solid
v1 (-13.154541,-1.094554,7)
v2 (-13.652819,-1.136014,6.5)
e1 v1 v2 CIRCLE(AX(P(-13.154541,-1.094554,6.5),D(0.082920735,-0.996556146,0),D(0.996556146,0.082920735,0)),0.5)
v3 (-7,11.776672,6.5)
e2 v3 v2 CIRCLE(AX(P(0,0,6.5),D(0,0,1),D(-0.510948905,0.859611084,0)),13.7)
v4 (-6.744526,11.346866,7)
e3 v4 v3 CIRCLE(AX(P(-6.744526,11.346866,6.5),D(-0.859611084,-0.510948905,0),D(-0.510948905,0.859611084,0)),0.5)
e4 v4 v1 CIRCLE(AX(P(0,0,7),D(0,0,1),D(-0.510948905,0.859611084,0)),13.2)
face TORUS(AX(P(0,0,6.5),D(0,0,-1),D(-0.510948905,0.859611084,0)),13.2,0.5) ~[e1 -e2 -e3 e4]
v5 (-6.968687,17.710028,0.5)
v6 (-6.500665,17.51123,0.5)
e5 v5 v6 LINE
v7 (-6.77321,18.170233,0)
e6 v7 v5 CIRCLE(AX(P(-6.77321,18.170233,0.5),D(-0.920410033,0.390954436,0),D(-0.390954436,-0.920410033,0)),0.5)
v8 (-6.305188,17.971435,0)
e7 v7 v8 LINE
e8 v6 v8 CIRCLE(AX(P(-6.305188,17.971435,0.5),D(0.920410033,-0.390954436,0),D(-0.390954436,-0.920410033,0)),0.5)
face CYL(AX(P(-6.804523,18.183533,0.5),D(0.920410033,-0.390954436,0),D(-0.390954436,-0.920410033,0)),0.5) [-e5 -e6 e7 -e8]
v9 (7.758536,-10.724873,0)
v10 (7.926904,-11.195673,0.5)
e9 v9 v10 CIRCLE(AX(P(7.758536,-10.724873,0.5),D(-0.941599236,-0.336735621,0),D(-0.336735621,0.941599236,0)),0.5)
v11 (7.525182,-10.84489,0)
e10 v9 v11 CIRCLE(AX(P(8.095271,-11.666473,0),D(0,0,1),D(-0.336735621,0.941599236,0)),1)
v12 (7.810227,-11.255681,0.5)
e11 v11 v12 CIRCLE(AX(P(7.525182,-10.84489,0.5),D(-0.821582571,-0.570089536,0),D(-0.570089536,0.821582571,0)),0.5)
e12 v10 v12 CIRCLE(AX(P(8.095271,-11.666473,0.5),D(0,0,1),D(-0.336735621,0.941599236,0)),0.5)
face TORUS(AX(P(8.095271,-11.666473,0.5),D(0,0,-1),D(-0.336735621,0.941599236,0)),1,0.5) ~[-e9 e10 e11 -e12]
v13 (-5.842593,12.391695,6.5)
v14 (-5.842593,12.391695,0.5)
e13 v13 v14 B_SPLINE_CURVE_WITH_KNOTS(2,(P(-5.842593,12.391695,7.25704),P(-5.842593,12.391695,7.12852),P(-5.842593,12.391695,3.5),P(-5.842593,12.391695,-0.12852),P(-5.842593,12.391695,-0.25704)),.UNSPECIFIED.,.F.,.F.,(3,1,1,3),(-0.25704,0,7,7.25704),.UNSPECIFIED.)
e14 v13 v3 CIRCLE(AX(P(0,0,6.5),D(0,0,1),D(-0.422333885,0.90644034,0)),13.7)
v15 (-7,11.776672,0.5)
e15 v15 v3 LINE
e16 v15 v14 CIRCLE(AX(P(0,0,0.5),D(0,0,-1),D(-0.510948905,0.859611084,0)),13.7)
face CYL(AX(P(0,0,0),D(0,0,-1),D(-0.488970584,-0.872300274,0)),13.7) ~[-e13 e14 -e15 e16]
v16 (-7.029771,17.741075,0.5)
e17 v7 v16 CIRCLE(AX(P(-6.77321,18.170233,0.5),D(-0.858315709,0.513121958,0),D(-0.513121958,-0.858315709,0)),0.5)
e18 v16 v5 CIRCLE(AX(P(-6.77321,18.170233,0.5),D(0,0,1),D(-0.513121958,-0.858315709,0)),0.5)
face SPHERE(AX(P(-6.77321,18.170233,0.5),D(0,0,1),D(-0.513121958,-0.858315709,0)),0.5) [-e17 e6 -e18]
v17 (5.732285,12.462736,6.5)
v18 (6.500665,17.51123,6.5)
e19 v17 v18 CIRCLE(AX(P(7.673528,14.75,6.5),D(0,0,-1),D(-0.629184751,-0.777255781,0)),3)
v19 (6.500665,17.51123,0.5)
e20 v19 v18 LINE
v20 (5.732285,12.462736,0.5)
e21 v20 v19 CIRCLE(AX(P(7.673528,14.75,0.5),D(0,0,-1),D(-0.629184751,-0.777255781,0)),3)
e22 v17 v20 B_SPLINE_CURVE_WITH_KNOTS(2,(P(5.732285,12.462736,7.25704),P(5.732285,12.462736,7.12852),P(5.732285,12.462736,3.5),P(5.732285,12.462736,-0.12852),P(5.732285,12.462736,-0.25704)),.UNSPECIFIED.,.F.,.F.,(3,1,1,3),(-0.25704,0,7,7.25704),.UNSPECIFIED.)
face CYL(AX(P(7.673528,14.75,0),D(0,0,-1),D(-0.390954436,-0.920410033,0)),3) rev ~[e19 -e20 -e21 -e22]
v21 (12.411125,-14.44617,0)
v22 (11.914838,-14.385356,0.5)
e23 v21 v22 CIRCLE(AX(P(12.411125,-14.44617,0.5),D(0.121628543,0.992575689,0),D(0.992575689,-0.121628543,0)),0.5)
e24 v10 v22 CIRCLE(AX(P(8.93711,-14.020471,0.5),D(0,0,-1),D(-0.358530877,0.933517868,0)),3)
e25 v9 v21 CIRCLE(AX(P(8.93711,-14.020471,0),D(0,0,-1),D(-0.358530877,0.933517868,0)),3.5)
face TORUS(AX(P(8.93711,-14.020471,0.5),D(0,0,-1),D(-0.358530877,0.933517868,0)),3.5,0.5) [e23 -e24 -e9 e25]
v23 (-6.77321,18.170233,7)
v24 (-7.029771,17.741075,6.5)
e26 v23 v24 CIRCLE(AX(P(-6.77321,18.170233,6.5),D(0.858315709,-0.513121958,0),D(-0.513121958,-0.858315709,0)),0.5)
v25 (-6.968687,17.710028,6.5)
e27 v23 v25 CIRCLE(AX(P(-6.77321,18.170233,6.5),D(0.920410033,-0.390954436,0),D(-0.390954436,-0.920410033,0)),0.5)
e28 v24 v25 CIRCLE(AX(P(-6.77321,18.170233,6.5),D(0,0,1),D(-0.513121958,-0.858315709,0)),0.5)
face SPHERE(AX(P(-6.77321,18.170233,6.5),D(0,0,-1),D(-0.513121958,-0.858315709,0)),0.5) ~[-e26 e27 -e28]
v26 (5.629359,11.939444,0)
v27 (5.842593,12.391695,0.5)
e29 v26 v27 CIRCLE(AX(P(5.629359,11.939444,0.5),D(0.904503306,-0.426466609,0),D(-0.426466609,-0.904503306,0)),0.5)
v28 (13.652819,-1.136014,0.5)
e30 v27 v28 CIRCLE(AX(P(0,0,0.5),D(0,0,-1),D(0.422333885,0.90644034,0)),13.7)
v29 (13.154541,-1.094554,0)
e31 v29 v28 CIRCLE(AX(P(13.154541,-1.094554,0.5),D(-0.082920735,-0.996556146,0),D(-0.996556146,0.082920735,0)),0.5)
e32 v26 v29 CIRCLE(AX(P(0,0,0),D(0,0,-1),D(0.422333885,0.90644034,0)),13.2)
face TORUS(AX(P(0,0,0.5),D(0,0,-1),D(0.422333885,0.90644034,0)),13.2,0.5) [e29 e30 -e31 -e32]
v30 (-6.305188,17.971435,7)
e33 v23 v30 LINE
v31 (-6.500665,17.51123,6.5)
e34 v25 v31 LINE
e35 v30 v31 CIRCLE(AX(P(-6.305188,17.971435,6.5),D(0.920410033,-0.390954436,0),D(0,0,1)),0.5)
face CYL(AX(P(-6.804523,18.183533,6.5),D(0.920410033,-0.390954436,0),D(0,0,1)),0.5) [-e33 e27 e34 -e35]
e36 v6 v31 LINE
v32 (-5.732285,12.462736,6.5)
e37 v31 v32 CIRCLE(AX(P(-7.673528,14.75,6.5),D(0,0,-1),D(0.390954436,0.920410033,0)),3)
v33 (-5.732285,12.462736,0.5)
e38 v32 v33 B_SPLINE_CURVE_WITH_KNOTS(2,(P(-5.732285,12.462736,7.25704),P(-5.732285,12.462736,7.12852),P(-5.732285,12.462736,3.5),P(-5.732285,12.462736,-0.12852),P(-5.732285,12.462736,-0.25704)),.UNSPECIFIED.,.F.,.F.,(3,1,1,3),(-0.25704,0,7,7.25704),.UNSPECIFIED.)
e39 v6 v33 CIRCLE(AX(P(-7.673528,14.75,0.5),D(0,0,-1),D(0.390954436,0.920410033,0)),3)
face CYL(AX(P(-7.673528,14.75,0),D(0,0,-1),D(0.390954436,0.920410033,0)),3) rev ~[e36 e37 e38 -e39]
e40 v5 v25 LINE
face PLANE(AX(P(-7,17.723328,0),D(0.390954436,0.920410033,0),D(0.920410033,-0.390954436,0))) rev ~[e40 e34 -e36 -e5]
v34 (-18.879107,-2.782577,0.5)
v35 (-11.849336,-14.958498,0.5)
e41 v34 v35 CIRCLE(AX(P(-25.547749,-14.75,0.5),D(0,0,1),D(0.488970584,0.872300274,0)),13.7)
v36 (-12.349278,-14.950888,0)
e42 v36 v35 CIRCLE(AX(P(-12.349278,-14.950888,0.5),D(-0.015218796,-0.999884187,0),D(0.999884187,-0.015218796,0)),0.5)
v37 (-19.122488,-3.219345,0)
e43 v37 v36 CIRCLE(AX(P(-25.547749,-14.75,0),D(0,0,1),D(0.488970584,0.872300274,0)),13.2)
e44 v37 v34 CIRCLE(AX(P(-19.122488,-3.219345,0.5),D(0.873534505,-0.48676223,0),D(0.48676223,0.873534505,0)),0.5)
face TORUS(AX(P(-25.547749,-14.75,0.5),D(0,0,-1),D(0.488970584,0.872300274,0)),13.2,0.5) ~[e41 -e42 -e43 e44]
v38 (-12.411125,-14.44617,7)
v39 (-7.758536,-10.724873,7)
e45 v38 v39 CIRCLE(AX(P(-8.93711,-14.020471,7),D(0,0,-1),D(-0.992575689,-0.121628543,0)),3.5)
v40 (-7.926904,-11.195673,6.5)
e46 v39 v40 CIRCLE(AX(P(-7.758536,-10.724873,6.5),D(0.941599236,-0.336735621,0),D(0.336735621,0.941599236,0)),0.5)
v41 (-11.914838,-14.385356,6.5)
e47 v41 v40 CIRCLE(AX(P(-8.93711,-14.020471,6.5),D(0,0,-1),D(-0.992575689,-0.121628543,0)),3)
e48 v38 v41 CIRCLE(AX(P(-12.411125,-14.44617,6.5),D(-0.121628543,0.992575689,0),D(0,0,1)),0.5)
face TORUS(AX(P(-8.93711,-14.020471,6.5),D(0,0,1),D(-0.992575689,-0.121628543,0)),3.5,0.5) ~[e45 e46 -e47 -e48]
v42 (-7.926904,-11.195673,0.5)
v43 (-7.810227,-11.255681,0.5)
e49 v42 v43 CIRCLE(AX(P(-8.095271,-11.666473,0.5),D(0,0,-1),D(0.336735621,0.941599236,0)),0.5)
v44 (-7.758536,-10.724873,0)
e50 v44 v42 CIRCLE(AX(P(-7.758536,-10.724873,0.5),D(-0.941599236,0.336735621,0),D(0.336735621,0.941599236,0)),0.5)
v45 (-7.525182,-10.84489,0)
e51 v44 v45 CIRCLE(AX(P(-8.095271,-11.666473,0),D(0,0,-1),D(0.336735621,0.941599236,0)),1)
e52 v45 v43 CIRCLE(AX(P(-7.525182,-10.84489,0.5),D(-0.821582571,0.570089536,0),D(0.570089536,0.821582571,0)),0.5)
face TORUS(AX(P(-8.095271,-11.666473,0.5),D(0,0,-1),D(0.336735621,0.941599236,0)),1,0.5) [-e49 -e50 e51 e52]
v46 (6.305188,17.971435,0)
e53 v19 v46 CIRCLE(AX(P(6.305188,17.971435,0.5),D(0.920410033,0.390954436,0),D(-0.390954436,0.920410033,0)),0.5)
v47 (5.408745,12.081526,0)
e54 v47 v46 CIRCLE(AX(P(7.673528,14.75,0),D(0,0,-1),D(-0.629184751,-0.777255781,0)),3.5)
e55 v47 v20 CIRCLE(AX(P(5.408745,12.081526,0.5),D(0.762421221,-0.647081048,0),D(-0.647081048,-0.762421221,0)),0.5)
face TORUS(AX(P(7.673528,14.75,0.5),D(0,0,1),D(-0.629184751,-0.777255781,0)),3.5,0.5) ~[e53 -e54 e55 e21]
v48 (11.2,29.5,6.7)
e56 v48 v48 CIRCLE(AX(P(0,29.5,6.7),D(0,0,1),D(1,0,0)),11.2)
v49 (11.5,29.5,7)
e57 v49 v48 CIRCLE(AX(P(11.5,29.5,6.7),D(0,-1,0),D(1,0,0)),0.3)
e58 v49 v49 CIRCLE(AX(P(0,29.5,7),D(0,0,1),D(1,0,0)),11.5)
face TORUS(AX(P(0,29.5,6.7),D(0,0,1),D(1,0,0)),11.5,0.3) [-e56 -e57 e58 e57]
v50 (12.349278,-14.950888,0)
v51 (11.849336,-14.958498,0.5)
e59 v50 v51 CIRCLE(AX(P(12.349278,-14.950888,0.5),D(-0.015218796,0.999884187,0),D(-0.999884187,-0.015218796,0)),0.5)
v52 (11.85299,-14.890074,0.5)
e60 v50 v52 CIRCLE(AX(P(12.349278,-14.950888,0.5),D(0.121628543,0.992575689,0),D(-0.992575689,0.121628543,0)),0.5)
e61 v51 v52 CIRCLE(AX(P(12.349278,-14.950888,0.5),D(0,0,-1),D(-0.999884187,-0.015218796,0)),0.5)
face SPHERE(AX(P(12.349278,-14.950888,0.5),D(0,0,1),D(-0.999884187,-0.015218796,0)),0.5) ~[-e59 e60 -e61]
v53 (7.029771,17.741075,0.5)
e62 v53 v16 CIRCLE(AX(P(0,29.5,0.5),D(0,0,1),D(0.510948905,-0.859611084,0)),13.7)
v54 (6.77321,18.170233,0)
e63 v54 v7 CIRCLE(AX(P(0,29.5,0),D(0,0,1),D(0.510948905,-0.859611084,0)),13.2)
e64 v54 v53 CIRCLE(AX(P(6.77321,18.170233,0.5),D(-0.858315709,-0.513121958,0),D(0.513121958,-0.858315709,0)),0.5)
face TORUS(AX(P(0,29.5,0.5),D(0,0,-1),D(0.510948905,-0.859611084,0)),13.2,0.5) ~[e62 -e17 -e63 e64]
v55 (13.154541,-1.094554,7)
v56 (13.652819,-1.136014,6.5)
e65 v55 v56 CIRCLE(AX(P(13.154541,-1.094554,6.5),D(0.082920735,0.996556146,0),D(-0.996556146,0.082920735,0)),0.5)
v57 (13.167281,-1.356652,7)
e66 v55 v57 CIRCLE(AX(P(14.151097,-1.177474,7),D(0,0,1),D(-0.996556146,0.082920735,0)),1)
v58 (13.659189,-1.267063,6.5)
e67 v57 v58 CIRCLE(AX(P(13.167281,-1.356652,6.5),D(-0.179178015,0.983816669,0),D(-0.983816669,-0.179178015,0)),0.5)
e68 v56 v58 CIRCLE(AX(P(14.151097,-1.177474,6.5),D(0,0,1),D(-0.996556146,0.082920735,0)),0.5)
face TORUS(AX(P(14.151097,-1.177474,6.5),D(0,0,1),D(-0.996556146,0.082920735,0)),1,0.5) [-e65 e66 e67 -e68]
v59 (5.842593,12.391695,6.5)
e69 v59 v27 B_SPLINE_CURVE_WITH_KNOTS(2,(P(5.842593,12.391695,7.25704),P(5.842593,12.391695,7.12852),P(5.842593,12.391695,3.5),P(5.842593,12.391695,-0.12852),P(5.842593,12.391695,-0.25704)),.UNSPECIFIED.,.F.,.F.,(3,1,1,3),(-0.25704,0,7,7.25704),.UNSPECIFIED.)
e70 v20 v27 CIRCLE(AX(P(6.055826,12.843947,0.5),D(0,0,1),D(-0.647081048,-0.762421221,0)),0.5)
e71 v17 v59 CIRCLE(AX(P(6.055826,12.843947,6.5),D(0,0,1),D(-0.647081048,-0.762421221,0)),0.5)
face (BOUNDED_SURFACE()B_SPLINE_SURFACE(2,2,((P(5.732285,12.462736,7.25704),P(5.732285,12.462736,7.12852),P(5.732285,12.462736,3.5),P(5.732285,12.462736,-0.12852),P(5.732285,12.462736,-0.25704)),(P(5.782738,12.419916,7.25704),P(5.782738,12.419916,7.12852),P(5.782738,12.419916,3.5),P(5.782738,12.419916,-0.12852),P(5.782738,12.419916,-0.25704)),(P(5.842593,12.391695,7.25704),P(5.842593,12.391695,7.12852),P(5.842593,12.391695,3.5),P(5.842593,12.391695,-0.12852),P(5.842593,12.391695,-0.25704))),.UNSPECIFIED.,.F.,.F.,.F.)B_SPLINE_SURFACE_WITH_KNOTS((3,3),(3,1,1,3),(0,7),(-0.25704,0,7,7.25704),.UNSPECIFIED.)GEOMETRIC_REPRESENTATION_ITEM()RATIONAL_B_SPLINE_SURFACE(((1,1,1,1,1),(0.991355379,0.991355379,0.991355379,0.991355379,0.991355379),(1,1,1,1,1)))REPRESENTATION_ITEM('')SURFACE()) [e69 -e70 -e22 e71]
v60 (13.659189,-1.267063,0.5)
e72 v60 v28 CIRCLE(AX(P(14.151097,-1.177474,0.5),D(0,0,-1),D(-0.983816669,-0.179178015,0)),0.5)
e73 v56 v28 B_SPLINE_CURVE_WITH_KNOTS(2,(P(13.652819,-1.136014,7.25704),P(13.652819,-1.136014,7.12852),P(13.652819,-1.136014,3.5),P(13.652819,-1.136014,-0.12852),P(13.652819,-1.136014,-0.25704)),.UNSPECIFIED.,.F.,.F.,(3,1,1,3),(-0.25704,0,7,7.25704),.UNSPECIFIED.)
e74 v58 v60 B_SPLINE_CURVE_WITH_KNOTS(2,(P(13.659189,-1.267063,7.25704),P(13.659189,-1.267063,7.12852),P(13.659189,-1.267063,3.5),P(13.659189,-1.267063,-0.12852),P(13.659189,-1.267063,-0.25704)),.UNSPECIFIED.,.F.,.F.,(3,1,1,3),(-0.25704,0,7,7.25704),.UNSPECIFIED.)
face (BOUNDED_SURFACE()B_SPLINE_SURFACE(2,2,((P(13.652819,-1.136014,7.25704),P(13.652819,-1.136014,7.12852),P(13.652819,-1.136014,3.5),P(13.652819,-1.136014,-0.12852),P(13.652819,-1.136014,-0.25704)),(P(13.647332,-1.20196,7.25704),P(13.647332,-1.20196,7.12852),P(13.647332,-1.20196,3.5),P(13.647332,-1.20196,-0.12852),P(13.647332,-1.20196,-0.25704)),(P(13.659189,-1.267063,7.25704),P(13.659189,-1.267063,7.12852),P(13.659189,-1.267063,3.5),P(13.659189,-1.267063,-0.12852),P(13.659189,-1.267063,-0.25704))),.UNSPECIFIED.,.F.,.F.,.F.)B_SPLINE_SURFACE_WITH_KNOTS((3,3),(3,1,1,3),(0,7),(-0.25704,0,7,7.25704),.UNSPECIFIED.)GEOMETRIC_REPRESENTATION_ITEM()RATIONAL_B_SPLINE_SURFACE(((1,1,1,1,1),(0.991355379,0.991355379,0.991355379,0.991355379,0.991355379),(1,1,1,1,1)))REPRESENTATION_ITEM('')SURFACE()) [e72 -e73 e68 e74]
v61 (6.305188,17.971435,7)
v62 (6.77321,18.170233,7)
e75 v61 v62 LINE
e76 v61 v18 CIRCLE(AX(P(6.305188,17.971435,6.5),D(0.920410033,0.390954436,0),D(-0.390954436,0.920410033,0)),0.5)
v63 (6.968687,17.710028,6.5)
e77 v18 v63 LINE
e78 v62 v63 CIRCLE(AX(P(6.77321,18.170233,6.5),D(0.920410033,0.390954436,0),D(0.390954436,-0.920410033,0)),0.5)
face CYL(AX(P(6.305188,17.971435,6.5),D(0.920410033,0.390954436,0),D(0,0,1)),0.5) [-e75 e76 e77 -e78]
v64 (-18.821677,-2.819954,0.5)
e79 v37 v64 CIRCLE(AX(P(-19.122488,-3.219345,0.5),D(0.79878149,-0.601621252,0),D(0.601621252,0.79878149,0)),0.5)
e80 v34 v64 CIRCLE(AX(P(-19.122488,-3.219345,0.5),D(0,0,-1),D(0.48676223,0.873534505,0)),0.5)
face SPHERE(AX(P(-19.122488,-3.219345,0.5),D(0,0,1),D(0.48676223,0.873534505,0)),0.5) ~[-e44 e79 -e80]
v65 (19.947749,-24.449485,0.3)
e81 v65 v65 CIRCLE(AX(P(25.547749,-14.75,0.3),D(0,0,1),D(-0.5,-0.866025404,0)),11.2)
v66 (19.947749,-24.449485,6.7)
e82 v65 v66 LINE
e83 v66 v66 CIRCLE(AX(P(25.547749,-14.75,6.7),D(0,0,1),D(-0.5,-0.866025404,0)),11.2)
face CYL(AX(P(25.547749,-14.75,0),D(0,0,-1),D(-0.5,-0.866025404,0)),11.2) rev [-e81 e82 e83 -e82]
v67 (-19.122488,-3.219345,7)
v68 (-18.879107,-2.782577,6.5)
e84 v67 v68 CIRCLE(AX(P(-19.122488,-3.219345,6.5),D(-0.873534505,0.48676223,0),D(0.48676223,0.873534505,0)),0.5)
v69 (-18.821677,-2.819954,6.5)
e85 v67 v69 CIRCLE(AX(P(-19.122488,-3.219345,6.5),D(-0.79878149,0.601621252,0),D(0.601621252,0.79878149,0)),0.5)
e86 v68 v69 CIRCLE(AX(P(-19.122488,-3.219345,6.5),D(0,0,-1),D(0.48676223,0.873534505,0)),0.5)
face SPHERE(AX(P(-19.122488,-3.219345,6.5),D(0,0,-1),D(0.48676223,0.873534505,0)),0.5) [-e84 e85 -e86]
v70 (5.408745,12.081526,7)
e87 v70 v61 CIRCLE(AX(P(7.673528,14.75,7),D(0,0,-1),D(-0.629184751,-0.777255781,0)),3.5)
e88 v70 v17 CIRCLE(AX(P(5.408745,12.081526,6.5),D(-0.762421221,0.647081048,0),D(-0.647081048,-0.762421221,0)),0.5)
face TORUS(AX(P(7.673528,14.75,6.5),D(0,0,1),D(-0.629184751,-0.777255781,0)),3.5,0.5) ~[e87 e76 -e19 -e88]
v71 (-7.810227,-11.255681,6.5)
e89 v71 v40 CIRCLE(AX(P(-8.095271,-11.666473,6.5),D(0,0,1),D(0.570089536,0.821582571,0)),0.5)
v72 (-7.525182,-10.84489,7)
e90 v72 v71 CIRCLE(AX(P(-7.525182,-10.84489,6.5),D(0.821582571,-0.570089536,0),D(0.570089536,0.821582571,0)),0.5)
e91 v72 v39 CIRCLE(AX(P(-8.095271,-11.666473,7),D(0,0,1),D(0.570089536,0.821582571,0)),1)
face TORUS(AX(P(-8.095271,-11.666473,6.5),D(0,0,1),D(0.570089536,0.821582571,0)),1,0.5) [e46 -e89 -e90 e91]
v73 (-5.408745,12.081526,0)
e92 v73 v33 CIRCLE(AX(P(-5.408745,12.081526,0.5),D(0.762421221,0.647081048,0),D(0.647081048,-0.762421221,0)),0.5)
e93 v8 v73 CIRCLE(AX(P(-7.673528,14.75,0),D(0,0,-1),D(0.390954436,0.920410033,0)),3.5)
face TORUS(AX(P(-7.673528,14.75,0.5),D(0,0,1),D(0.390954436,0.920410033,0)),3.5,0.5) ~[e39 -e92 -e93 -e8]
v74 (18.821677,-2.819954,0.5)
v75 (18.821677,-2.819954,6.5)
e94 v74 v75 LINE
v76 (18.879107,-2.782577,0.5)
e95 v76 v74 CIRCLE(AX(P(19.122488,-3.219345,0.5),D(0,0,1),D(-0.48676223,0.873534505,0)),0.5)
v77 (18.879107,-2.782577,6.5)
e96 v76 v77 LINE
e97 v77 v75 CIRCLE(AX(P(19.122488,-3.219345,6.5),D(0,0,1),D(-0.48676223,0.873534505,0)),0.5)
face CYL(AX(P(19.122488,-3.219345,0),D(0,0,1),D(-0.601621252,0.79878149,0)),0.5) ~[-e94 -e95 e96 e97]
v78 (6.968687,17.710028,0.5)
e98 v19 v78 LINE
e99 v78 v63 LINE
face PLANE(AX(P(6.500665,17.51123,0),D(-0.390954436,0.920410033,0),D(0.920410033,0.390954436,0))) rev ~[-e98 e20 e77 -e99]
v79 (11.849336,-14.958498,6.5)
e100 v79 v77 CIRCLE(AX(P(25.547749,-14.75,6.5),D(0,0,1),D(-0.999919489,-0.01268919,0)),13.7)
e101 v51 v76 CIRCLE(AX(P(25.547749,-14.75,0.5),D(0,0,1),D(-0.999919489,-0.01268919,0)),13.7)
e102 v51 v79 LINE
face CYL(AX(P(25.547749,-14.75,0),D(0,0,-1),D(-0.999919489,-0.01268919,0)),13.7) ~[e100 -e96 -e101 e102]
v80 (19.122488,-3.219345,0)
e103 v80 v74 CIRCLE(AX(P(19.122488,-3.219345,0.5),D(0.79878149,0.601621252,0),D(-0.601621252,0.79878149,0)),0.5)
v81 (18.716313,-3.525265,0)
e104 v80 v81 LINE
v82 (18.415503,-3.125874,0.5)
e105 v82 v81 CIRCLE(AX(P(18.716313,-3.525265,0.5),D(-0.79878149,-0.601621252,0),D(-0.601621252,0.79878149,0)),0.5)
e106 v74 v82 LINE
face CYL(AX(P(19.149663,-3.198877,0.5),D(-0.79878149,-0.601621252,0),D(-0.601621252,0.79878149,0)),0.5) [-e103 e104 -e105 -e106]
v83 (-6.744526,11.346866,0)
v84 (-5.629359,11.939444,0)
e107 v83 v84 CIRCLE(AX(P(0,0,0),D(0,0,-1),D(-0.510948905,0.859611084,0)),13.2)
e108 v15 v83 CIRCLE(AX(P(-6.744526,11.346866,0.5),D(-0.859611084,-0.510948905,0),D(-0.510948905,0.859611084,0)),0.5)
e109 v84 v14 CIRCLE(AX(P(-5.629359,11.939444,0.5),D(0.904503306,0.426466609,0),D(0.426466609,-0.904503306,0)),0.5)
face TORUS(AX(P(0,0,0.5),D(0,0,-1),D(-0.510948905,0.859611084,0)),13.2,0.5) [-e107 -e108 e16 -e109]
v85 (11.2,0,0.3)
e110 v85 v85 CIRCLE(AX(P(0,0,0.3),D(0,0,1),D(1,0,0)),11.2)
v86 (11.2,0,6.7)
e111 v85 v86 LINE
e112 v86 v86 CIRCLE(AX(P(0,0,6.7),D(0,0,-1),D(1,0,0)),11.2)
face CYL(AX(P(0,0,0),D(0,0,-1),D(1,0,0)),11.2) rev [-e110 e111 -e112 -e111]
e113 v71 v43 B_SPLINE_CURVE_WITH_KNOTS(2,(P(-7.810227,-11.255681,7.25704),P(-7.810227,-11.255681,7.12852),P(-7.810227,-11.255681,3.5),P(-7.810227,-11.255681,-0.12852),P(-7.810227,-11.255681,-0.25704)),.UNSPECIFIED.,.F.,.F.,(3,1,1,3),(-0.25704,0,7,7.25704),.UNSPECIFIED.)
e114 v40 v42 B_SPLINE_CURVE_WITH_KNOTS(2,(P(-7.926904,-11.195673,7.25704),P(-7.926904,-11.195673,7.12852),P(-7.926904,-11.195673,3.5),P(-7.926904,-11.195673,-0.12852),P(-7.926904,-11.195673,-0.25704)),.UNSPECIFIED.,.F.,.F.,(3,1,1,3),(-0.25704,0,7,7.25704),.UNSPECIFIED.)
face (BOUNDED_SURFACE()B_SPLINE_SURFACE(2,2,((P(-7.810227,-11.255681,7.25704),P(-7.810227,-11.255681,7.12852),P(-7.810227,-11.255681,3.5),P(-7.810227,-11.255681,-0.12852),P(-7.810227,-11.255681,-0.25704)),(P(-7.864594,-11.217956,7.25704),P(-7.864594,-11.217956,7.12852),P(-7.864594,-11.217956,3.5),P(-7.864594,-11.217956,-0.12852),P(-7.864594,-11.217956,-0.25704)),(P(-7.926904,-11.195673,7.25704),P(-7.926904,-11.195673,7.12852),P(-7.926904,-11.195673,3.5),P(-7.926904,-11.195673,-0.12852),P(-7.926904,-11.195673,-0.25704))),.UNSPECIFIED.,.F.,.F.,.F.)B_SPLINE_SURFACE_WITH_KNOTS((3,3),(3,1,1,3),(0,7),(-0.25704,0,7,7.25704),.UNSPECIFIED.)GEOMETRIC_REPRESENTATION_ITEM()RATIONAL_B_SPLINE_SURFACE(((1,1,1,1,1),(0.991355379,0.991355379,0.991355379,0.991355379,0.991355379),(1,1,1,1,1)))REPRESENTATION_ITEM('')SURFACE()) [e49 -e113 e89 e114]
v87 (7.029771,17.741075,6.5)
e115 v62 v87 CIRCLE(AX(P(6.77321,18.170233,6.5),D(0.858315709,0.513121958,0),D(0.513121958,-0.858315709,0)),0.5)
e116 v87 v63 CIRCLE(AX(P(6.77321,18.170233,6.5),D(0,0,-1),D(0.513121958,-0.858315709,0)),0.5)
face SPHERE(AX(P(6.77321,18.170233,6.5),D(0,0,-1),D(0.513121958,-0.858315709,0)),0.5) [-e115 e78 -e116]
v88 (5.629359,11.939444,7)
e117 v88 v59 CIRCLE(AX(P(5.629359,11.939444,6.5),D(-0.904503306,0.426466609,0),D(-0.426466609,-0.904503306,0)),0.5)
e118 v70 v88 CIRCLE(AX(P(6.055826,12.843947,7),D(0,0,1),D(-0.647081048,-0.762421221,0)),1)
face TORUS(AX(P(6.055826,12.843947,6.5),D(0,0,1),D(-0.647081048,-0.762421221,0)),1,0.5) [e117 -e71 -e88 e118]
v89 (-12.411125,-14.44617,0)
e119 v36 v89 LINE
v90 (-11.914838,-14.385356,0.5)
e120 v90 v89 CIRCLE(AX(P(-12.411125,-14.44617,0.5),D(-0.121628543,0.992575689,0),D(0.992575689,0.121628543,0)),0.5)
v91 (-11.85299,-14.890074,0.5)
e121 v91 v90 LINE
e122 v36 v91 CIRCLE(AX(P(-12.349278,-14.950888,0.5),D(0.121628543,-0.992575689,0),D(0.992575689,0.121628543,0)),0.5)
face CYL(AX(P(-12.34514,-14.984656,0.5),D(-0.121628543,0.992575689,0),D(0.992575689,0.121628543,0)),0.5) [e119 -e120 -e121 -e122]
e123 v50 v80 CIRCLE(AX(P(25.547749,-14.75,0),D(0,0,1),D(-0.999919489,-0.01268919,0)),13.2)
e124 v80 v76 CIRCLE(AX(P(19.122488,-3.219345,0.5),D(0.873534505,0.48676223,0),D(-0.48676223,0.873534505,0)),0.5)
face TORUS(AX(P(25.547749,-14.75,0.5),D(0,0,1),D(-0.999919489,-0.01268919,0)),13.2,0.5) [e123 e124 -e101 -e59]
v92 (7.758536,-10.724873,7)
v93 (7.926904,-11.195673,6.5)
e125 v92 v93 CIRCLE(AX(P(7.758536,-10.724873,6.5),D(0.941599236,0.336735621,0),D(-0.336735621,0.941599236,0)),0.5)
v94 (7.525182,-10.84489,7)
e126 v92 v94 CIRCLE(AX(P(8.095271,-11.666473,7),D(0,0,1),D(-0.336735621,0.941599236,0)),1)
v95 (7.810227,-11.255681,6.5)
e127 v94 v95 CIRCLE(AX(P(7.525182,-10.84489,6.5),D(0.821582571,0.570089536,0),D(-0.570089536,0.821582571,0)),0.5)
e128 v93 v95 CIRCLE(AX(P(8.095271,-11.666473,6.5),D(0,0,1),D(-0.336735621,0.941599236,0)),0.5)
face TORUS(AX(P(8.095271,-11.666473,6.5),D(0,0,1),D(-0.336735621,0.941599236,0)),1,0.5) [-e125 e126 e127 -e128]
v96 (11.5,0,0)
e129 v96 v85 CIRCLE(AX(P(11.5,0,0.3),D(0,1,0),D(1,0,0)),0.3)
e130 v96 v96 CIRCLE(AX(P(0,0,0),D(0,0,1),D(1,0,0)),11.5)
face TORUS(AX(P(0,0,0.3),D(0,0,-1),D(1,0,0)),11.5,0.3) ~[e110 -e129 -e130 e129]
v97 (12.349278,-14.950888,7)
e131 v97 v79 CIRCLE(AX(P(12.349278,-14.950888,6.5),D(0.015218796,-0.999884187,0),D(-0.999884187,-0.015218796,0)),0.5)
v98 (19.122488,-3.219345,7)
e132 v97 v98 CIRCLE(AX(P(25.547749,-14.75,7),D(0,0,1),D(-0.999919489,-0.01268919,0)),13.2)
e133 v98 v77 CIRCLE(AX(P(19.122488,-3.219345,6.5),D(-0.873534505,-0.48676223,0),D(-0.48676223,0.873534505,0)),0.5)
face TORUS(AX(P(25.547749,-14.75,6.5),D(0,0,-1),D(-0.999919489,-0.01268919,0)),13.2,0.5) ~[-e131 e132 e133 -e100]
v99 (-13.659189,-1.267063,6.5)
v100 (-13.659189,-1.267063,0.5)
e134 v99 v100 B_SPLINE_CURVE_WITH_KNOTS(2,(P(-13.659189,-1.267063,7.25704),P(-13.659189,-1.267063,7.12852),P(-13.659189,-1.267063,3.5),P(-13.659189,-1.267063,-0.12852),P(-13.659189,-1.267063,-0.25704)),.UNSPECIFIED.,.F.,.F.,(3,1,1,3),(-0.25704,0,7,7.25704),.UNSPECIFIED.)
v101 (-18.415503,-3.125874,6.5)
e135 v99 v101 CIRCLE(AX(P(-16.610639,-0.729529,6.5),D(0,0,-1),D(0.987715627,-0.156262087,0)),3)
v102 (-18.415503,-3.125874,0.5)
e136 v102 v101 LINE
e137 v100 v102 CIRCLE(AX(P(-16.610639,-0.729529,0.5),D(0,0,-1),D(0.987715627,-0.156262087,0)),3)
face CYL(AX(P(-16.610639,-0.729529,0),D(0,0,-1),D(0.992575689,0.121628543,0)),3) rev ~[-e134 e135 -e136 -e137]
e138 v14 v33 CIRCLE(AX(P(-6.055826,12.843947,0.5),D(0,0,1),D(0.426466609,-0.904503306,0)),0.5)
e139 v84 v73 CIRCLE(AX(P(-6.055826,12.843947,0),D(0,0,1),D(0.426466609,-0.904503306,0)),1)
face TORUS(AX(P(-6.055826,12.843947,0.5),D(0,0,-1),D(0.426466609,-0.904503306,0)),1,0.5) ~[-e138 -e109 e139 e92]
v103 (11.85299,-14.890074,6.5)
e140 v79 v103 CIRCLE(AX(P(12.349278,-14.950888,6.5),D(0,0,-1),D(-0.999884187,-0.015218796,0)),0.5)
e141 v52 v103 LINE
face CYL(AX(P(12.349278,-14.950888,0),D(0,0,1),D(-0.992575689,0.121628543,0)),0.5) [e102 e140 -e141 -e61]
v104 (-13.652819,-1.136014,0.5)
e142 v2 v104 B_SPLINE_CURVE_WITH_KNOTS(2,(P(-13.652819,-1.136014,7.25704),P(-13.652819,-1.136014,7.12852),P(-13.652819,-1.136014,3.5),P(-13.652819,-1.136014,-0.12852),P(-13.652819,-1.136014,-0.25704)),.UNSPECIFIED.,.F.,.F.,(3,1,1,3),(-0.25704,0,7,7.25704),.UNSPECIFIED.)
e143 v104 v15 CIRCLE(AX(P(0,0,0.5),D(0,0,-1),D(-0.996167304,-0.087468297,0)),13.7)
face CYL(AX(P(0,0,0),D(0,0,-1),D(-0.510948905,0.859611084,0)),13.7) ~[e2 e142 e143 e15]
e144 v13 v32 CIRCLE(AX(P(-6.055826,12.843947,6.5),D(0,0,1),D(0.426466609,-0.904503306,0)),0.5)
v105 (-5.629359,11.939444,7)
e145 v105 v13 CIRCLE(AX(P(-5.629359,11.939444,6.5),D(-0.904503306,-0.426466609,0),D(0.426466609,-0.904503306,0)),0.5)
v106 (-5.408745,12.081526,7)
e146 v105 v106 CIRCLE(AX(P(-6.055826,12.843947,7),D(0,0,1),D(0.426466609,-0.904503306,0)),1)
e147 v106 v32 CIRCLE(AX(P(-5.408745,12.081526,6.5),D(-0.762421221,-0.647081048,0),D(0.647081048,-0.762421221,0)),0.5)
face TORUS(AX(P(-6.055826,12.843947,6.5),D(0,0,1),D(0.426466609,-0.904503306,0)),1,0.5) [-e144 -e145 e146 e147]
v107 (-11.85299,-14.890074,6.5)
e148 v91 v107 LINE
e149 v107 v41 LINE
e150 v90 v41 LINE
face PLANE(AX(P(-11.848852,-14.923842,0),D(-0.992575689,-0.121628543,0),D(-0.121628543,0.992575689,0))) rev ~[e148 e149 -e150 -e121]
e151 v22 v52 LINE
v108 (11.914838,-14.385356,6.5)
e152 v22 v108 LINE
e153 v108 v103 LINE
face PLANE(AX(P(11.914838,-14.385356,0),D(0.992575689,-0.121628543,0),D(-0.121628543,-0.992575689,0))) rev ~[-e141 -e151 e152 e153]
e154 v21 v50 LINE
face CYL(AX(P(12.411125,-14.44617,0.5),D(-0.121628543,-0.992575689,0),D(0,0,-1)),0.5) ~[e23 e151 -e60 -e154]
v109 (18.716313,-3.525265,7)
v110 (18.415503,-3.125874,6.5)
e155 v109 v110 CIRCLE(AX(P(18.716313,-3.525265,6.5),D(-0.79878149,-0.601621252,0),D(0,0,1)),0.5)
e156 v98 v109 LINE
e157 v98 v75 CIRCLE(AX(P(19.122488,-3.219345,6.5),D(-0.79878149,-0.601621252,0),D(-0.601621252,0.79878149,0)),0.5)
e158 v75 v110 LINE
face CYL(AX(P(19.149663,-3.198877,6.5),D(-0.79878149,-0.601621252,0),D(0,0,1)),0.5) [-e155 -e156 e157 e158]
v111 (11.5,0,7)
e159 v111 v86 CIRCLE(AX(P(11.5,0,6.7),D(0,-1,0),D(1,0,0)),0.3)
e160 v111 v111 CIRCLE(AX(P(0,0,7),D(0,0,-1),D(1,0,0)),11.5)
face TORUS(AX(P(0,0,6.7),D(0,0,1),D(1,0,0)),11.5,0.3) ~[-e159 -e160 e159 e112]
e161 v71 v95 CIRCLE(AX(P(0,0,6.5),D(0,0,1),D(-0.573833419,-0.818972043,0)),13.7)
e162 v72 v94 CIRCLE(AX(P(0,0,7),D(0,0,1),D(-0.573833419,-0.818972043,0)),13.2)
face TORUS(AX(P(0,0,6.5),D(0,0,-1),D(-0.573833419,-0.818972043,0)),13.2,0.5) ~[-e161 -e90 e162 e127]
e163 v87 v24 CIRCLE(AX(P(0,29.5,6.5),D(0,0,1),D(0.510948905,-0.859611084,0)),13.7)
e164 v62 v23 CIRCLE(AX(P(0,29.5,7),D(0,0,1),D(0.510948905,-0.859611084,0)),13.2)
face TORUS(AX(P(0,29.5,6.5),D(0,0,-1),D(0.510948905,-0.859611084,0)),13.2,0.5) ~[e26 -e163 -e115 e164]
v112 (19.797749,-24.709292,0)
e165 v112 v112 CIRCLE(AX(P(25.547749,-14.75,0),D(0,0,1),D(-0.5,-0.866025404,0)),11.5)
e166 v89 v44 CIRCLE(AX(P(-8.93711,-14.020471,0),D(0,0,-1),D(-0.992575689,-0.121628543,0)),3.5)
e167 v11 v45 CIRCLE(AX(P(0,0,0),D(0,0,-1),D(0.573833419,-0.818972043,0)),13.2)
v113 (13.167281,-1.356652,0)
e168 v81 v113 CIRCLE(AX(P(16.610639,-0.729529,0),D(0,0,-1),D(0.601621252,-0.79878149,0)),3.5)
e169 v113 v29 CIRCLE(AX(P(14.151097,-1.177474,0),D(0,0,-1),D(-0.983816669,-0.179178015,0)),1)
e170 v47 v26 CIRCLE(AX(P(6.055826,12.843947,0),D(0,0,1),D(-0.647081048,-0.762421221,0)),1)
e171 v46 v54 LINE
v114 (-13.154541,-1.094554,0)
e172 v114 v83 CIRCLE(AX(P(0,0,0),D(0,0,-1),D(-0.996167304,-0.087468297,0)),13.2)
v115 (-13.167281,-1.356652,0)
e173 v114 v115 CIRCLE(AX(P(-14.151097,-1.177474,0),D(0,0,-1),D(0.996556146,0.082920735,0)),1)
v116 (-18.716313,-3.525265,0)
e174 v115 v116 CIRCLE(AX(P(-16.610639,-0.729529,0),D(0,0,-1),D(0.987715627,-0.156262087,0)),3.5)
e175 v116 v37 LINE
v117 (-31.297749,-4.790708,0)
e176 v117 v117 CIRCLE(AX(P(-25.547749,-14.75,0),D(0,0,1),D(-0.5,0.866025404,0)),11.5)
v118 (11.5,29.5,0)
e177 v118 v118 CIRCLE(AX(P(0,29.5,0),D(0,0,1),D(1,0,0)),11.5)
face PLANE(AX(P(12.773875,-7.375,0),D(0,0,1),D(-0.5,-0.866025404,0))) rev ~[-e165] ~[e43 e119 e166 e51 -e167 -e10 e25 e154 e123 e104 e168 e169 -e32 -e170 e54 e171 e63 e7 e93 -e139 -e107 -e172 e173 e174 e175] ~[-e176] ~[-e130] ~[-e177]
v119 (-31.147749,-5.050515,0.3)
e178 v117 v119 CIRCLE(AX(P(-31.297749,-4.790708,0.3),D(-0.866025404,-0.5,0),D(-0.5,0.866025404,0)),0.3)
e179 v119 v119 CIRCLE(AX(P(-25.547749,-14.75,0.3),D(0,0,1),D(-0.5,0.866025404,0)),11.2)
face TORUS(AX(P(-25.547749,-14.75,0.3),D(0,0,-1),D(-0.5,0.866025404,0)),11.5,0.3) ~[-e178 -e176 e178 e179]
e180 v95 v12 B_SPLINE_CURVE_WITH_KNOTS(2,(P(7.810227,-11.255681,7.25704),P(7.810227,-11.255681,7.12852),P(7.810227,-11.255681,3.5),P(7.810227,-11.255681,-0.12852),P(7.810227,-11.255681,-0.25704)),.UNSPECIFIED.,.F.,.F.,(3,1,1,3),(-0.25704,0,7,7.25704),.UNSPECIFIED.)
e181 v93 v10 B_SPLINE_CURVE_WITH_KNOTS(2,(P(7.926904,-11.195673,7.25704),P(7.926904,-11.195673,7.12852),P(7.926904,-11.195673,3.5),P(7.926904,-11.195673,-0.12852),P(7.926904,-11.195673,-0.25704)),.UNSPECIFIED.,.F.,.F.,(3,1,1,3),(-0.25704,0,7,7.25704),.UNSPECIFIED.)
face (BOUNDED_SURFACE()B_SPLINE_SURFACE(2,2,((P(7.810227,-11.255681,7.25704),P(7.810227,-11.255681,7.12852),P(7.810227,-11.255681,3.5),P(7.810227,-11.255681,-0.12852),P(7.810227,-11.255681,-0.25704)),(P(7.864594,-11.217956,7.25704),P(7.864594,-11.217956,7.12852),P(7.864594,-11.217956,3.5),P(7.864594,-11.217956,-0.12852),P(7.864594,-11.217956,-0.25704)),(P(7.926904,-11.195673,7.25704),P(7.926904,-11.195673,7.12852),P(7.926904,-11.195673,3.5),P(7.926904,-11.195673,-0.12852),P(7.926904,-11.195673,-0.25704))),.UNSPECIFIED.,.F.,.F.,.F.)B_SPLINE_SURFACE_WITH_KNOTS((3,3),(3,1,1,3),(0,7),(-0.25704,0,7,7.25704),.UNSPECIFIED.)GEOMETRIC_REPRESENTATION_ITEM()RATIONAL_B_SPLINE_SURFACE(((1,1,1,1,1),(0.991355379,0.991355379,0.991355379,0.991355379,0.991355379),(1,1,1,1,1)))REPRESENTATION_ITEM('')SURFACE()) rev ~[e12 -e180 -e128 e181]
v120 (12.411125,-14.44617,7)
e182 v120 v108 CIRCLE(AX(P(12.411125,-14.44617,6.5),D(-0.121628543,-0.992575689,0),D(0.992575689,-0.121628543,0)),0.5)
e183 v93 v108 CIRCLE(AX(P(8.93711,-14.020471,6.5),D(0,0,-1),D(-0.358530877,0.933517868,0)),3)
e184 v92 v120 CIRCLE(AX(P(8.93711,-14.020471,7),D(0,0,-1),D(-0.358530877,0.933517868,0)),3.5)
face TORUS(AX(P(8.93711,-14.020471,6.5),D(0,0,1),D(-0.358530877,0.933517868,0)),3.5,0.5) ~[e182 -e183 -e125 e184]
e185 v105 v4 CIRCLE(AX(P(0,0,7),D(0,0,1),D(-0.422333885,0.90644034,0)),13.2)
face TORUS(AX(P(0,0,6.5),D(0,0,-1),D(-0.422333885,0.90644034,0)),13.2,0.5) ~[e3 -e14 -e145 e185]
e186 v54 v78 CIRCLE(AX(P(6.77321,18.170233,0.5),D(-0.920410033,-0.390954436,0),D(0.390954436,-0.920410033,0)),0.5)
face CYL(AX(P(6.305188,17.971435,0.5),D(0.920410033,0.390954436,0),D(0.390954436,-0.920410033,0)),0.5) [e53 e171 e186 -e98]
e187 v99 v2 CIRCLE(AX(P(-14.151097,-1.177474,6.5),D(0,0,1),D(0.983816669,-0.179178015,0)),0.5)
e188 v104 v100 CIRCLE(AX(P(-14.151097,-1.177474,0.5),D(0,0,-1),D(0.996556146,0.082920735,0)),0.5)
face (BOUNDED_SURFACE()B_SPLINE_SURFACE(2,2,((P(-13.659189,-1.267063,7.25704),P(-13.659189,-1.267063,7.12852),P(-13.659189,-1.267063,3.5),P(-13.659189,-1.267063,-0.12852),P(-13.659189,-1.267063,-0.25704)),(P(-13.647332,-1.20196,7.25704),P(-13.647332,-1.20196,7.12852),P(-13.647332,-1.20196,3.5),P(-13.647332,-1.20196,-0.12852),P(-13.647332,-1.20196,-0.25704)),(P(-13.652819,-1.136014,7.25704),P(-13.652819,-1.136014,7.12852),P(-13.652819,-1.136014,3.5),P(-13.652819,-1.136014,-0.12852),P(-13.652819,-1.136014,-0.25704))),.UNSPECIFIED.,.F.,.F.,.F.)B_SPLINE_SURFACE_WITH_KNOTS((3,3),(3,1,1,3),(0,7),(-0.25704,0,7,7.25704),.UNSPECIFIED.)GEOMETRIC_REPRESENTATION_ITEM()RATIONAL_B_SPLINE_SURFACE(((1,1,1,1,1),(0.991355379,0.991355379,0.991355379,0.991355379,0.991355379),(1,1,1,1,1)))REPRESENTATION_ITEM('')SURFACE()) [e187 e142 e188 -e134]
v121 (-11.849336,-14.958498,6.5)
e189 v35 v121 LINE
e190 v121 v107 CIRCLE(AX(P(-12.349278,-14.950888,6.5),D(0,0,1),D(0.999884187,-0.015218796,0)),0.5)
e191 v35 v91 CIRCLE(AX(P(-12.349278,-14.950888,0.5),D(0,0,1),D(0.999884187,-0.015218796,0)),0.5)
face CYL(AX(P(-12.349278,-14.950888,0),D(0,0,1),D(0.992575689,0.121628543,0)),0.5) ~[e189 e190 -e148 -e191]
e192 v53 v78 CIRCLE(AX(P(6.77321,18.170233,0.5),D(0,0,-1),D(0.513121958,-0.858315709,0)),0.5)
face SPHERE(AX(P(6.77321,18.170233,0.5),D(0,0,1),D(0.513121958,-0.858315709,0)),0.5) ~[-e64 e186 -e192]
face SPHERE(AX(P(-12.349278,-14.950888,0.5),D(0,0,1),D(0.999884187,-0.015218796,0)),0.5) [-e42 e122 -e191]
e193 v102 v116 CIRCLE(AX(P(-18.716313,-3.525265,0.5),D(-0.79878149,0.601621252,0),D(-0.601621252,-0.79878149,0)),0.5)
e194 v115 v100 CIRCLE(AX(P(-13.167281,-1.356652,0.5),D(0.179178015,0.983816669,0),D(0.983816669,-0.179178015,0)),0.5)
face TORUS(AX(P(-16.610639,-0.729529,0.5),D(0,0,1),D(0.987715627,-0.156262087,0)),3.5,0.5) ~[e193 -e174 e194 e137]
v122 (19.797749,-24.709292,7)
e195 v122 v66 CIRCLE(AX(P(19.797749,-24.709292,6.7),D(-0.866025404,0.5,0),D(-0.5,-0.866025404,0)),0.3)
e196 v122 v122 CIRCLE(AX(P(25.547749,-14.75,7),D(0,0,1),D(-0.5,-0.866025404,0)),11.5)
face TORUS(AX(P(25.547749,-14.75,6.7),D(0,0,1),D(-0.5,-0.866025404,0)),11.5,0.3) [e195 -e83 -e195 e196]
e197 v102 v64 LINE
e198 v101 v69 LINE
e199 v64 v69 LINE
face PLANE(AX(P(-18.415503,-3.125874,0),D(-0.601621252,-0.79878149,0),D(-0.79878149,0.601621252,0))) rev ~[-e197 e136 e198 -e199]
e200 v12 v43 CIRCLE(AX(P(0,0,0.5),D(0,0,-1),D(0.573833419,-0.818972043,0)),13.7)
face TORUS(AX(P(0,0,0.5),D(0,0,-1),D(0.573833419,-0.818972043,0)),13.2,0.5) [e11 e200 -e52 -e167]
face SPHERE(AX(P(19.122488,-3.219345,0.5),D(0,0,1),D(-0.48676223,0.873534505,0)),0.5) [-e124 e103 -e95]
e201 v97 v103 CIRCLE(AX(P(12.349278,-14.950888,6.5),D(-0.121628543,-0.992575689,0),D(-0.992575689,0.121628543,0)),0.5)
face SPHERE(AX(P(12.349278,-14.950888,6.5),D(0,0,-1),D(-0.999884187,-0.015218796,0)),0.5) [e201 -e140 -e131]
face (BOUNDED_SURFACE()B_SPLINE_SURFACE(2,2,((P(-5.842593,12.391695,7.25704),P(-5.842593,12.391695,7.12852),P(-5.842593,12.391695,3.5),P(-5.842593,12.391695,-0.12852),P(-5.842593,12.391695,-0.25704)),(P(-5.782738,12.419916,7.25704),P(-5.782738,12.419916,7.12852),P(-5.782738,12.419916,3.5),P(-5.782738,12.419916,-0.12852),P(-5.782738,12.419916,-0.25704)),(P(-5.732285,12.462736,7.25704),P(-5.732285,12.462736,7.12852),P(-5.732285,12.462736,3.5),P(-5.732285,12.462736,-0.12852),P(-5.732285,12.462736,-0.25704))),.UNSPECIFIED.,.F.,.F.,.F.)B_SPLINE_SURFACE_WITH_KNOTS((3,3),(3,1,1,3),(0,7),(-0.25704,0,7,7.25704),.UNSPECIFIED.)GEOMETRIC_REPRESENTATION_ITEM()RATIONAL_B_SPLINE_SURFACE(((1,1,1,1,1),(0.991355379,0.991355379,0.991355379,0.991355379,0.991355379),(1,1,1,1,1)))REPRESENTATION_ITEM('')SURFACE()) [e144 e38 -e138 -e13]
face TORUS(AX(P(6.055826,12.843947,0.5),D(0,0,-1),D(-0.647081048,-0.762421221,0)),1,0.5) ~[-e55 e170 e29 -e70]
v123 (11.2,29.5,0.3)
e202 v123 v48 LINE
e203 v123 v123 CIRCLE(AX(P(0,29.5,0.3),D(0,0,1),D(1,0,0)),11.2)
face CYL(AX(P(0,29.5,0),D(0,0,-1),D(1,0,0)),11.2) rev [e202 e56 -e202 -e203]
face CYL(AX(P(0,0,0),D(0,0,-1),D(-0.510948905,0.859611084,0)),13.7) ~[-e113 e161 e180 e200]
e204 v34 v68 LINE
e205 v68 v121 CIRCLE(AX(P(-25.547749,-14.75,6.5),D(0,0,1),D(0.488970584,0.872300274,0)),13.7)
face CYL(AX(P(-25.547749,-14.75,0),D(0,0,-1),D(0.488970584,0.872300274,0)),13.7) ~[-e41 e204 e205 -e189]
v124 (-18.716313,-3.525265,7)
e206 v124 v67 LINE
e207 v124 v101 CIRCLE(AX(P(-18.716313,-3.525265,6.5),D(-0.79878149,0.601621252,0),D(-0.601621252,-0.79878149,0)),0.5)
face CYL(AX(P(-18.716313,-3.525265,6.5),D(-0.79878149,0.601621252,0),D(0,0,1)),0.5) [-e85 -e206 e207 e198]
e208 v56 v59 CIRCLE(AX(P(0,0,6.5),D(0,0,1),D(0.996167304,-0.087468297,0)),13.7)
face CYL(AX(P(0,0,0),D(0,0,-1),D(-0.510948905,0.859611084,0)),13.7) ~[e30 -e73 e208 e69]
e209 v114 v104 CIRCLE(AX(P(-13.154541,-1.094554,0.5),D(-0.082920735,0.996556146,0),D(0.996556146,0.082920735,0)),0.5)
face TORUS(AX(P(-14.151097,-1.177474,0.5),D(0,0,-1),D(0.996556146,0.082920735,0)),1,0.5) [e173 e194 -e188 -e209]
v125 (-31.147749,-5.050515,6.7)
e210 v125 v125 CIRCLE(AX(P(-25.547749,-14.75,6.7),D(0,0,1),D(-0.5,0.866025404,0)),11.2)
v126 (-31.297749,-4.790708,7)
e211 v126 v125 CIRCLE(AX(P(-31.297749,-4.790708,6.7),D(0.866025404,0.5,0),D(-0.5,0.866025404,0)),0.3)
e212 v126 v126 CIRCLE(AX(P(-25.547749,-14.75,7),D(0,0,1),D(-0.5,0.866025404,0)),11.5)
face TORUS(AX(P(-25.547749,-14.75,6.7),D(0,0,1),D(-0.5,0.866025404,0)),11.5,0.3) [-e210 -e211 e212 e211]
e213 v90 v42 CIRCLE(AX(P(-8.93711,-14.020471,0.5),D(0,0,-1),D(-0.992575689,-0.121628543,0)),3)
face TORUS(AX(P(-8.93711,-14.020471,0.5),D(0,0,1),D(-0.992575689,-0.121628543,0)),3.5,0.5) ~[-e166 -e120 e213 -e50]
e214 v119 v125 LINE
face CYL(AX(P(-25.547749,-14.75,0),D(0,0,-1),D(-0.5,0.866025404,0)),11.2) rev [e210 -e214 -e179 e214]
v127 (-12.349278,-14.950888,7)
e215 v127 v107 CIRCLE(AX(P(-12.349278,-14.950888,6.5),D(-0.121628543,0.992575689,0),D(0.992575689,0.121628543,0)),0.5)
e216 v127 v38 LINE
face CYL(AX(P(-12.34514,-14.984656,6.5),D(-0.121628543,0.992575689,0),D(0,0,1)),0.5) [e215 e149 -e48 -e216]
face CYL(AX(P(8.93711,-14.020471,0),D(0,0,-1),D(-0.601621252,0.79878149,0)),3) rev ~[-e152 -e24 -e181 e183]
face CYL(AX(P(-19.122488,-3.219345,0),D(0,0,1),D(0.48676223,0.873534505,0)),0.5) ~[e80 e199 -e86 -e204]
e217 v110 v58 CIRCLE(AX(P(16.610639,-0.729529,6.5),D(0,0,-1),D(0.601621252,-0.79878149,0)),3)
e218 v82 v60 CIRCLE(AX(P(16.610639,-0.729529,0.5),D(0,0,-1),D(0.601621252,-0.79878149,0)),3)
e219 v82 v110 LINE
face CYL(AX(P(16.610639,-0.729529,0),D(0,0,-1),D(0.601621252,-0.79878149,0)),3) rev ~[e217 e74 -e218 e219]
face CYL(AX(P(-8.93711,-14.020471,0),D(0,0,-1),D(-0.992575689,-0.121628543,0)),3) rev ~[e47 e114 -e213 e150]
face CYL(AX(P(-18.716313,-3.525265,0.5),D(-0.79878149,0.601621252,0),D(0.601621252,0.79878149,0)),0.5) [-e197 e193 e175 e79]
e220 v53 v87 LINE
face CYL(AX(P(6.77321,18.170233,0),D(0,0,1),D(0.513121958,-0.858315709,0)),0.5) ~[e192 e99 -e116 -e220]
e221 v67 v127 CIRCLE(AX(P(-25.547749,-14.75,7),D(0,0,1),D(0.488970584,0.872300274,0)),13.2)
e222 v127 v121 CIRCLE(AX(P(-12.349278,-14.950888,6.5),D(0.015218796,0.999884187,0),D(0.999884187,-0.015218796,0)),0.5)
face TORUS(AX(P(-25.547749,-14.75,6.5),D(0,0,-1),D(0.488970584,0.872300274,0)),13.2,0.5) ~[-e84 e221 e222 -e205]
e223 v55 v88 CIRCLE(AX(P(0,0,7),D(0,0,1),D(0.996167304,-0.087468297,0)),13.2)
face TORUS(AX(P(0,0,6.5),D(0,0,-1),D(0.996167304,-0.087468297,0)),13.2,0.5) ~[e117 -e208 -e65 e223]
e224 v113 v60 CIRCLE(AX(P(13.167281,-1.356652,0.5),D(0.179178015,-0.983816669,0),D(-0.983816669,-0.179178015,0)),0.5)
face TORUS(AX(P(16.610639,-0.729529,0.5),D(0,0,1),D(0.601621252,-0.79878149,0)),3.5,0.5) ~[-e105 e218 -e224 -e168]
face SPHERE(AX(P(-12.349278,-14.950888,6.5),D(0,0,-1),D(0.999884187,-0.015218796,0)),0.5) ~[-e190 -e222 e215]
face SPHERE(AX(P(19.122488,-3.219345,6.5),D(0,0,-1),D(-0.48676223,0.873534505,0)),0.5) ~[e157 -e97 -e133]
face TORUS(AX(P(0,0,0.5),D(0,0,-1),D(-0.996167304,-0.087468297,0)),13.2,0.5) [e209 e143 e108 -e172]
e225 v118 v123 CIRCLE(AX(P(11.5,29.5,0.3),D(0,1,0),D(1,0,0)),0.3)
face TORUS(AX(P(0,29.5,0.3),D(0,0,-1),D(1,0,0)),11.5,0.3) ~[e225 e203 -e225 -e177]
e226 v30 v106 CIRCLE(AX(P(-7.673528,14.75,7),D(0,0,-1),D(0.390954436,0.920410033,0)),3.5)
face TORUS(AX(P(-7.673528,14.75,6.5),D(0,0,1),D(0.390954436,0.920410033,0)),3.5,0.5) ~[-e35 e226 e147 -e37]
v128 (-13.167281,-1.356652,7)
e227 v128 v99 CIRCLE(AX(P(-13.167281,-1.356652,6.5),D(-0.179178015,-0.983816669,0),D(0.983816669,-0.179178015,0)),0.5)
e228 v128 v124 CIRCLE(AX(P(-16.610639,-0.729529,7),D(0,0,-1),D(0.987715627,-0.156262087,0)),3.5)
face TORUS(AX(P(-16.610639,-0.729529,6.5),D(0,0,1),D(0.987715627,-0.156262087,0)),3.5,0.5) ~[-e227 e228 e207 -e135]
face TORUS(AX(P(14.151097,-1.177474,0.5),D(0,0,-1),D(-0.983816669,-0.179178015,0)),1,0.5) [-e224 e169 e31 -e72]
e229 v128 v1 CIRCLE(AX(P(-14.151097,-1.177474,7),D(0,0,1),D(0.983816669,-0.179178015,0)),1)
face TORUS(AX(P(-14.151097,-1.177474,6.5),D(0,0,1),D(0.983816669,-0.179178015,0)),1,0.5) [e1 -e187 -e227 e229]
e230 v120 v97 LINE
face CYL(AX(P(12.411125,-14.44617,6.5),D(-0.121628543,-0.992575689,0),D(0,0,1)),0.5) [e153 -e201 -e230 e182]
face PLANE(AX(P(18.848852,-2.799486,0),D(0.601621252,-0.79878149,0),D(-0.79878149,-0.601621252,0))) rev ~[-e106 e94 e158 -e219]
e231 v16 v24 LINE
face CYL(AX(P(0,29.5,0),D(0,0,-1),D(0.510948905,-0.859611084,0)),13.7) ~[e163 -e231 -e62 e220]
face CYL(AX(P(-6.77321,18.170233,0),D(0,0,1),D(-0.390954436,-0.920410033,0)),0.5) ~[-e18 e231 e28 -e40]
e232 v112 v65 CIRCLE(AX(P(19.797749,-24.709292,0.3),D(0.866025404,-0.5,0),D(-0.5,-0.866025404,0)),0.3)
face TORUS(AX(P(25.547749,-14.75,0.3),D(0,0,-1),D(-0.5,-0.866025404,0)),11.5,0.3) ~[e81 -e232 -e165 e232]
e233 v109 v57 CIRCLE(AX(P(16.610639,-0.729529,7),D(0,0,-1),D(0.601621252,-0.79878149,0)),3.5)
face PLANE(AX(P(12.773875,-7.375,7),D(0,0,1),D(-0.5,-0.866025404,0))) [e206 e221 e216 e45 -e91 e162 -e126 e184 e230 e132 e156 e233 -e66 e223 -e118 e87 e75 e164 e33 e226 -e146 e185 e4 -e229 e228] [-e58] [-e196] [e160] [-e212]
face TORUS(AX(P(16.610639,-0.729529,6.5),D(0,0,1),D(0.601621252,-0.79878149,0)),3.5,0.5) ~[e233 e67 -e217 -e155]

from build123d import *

# Parameters (mm, degrees)
F0_R     = 11.2
F1_DEPTH = 7
F3_COUNT = 3
F4_R     = 0.5
F5_R     = 0.3


# Not quite as in the source:
# - a feature names something its author has since deleted; it is built from what else it names


with BuildPart() as f1:
    # F0 (on Top) → F1 (new body)
    with BuildSketch(Plane.XY):
        with BuildLine():
            Line((6.5006651649, 17.5112300987), (7, 17.7233281442))
            ThreePointArc((7, 17.7233281442), (0, 43.2), (-7, 17.7233281442))
            Line((-7, 17.7233281442), (-6.5006651649, 17.5112300987))
            ThreePointArc((-6.5006651649, 17.5112300987), (-4.6735284742, 14.75), (-6.5006651649, 11.9887699013))
            Line((-6.5006651649, 11.9887699013), (-7, 11.7766718558))
            ThreePointArc((-7, 11.7766718558), (0, -13.7), (7, 11.7766718558))
            Line((7, 11.7766718558), (6.5006651649, 11.9887699013))
            ThreePointArc((6.5006651649, 11.9887699013), (4.6735284742, 14.75), (6.5006651649, 17.5112300987))
        make_face()
        Circle(F0_R, mode=Mode.SUBTRACT)
        with Locations((0, 29.5)):
            Circle(F0_R, mode=Mode.SUBTRACT)
    extrude(amount=F1_DEPTH)

    # F3: F1 ×3 about axis
    f3_axis = Axis((0, 0, 1.5517235734), (0, 0, 1))


with BuildPart() as f1_1:
    add(f1.part)
    for i in range(1, F3_COUNT):
        add(f1.part.rotate(f3_axis, i * 360 / F3_COUNT))

    # F4
    f4_edges = [f1_1.edges().sort_by_distance(p)[0] for p in [
        (0, -13.7, 0),
        (-7.861518, -11.219917, 3.5),
        (0, -13.7, 7),
        (7.861518, -11.219917, 3.5),
        (11.864548, 6.85, 0),
        (13.647492, -1.198316, 3.5),
        (11.864548, 6.85, 7),
        (5.785974, 12.418233, 3.5),
        (-5.785974, 12.418233, 3.5),
        (-11.864548, 6.85, 7),
        (-13.647492, -1.198316, 3.5),
        (-11.864548, 6.85, 0),
        (-18.848852, -2.799486, 3.5),
        (-11.848852, -14.923842, 3.5),
        (-37.412297, -21.6, 0),
        (-37.412297, -21.6, 7),
        (-10.783602, -11.656053, 0),
        (-10.783602, -11.656053, 7),
        (-11.914838, -14.385356, 3.5),
        (-15.486239, -3.510847, 0),
        (-18.415503, -3.125874, 3.5),
        (-15.486239, -3.510847, 7),
        (10.783602, -11.656053, 0),
        (11.914838, -14.385356, 3.5),
        (10.783602, -11.656053, 7),
        (11.848852, -14.923842, 3.5),
        (18.848852, -2.799486, 3.5),
        (37.412297, -21.6, 0),
        (37.412297, -21.6, 7),
        (15.486239, -3.510847, 0),
        (15.486239, -3.510847, 7),
        (18.415503, -3.125874, 3.5),
        (4.702637, 15.1669, 0),
        (6.500665, 17.51123, 3.5),
        (4.702637, 15.1669, 7),
        (7, 17.723328, 3.5),
        (-7, 17.723328, 3.5),
        (0, 43.2, 0),
        (0, 43.2, 7),
        (-4.702637, 15.1669, 0),
        (-4.702637, 15.1669, 7),
        (-6.500665, 17.51123, 3.5),
    ]]
    fillet(f4_edges, radius=F4_R)

    # F5
    f5_edges = [f1_1.edges().sort_by_distance(p)[0] for p in [
        (11.2, 29.5, 3.5),
        (-11.2, 29.5, 0),
        (-11.2, 29.5, 7),
        (-11.2, 0, 0),
        (11.2, 0, 3.5),
        (-11.2, 0, 7),
        (19.947749, -24.449485, 3.5),
        (31.147749, -5.050515, 0),
        (31.147749, -5.050515, 7),
        (-31.147749, -5.050515, 3.5),
        (-19.947749, -24.449485, 0),
        (-19.947749, -24.449485, 7),
    ]]
    fillet(f5_edges, radius=F5_R)


solid = f1_1.part
